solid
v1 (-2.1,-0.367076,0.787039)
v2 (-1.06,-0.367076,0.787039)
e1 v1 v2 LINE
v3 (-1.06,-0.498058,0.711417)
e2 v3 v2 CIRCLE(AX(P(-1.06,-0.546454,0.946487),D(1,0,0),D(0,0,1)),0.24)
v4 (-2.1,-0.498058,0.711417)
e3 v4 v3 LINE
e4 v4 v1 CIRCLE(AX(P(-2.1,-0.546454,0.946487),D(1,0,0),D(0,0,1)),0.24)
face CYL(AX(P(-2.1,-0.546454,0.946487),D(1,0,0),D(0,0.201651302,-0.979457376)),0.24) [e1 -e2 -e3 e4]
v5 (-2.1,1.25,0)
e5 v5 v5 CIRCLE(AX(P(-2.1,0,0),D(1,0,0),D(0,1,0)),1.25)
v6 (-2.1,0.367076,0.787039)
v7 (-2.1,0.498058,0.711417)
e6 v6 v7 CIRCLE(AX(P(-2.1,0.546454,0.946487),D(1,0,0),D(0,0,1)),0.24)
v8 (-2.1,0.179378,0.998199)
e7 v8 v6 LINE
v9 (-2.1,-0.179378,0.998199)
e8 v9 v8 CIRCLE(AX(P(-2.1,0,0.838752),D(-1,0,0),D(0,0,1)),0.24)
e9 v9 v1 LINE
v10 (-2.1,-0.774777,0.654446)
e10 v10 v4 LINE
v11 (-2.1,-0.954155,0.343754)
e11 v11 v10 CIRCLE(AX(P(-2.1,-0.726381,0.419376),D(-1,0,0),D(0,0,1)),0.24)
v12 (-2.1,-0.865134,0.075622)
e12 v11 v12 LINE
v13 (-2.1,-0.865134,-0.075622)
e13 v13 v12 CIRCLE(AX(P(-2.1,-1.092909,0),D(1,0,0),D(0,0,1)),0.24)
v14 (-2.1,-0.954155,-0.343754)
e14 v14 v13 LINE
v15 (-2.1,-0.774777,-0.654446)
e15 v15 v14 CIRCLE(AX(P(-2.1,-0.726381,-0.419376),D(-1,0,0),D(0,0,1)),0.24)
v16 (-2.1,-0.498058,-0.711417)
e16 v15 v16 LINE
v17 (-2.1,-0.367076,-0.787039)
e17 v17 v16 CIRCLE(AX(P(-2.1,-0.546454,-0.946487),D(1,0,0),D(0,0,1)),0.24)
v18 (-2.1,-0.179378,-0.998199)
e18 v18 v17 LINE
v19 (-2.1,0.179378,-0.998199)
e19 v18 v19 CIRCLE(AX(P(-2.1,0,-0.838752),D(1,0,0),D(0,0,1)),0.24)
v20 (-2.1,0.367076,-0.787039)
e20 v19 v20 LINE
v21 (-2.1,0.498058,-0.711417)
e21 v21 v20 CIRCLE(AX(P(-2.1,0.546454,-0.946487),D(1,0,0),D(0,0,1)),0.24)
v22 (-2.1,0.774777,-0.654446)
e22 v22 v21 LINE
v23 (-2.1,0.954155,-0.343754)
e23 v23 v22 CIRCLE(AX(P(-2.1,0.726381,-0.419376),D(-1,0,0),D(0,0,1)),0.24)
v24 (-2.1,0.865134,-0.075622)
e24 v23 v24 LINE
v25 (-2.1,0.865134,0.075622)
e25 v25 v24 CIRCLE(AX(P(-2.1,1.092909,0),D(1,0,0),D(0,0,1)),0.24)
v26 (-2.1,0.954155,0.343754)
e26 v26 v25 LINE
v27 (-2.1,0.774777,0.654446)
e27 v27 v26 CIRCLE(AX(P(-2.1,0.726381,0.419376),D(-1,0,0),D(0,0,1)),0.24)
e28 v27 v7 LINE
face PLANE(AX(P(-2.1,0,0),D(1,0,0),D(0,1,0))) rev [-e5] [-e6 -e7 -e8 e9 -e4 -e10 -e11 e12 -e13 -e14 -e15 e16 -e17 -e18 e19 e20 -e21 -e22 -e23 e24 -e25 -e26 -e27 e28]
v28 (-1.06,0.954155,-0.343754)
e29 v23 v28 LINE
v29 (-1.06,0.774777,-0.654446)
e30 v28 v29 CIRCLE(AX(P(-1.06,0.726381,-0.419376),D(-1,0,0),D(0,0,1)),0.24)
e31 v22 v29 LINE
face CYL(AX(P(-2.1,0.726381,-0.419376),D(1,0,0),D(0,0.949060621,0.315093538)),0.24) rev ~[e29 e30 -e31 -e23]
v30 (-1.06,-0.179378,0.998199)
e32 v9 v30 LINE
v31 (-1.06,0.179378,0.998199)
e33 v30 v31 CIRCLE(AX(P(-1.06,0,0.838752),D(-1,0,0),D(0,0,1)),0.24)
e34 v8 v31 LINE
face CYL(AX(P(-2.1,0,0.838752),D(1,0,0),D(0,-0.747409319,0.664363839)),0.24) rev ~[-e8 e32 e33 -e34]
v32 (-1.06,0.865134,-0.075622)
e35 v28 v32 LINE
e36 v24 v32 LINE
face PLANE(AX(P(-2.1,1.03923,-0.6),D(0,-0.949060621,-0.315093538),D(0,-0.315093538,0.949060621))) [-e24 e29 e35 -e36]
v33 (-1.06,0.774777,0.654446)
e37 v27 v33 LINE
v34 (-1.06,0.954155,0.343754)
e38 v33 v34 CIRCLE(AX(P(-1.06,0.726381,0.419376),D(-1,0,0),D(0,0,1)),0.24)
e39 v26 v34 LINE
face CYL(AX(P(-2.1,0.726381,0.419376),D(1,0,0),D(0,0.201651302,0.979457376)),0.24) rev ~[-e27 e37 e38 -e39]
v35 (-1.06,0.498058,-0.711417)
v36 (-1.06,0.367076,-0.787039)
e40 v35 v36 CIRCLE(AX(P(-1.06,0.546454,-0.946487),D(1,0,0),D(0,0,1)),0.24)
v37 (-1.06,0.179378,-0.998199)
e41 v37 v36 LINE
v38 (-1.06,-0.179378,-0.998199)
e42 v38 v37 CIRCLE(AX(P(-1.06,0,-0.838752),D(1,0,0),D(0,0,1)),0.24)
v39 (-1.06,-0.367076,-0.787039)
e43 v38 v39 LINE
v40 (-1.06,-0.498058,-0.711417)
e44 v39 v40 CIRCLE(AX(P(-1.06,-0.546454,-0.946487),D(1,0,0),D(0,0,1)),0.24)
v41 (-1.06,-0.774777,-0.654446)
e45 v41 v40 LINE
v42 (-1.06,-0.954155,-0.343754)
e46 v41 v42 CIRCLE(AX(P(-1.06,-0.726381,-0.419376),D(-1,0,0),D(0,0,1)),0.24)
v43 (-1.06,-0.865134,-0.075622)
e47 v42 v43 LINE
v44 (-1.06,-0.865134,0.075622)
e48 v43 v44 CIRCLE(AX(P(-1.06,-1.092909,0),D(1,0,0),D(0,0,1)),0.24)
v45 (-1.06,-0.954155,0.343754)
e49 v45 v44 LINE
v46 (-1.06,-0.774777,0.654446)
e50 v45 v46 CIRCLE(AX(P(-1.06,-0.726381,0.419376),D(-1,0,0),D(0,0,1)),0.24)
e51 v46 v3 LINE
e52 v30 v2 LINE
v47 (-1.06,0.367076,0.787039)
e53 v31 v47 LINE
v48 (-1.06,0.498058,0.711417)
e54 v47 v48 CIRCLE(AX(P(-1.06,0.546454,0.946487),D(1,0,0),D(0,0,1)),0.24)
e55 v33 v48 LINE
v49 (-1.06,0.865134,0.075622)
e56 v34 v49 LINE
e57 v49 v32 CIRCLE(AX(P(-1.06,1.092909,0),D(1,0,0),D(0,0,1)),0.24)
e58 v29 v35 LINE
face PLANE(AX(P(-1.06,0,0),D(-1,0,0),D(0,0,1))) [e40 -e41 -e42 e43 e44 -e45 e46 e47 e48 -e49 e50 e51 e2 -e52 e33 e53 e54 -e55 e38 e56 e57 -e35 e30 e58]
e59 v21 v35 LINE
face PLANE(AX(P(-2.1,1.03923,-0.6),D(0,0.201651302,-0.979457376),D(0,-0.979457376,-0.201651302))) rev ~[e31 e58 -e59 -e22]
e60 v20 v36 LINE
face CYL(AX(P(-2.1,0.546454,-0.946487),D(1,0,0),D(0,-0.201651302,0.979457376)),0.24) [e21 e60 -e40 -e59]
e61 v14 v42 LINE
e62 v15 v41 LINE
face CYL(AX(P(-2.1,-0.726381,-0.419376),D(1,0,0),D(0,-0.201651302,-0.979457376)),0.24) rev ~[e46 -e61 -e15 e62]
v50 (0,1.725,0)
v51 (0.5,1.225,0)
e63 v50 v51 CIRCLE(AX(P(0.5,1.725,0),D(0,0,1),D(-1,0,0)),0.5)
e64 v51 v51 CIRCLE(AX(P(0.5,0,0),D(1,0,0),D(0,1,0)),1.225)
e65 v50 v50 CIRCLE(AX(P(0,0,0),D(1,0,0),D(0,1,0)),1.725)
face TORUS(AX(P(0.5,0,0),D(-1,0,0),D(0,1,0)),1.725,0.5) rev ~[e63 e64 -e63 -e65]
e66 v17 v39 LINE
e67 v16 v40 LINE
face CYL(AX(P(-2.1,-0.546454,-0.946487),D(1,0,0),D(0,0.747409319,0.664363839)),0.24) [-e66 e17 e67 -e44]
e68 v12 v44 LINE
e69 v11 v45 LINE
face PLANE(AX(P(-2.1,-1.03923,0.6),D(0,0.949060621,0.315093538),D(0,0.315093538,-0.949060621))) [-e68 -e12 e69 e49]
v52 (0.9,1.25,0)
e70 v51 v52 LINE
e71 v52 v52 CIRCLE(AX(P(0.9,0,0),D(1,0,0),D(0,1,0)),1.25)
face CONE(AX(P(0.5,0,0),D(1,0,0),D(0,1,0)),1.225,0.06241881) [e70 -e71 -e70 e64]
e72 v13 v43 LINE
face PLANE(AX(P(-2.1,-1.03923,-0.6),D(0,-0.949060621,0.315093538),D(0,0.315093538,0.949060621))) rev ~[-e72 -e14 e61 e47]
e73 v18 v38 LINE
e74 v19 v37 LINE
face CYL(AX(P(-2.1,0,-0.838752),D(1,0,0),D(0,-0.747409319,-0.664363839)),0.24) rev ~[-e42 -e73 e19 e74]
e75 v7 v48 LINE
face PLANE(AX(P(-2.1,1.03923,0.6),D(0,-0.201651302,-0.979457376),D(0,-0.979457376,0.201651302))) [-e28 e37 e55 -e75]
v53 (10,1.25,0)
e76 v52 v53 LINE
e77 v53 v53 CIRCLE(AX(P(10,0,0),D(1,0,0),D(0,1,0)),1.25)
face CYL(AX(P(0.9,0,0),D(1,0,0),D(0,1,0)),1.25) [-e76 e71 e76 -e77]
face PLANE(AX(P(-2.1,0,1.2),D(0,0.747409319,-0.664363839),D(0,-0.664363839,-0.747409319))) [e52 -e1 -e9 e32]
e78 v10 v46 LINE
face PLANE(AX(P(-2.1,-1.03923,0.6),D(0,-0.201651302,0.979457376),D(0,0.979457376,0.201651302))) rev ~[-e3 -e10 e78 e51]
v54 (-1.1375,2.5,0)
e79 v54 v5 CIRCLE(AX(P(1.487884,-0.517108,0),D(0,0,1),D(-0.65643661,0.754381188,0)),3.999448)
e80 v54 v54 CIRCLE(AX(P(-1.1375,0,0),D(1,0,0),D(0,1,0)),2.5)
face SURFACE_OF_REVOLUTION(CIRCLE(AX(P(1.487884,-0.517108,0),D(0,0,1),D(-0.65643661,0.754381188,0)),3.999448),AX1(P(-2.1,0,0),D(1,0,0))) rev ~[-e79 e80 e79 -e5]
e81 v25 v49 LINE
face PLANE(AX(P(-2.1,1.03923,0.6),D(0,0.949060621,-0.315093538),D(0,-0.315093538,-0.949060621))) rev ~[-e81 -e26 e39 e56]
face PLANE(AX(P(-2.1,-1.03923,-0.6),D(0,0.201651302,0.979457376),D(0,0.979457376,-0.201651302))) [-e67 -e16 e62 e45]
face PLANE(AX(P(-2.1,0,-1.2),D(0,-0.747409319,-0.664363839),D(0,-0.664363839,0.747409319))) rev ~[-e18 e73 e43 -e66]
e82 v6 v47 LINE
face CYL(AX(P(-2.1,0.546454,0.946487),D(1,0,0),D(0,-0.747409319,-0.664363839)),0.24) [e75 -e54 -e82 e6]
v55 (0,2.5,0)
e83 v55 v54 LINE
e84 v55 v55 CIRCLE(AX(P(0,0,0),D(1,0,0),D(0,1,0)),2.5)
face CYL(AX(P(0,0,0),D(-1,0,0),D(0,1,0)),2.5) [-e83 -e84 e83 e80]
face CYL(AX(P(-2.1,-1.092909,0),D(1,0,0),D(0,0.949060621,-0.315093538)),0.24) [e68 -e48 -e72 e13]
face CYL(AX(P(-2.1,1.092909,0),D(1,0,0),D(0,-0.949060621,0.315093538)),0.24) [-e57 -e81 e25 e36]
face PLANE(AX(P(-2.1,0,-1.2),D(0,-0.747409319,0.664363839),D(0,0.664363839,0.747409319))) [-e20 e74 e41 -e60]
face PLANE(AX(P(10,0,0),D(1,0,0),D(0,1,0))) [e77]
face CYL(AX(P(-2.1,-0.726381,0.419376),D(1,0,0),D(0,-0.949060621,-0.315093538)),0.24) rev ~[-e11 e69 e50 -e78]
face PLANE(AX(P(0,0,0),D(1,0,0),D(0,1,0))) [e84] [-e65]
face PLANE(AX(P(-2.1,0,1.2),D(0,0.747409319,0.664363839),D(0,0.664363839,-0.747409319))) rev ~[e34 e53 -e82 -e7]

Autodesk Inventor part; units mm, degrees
ref_plane "YZ Plane" through (0, 0, 0) normal (1, 0, 0) x (0, 1, 0)
ref_plane "XZ Plane" through (0, 0, 0) normal (0, 1, 0) x (-1, 0, 0)
ref_plane "XY Plane" through (0, 0, 0) normal (0, 0, 1) x (1, 0, 0)
sketch "Sketch4" plane through (0, 0, 0) normal (0, 0, 1) x (1, 0, 0)
  line L0 (-2.1, 0) -> (10, 0)
  line L1 (0, 0) -> (-2.1, 0)
  line L2 (0, 2.5) -> (0, 1.725)
  line L3 (0.5, 1.225) -> (0.5, 1.225)
  line L4 (0.5, 1.225) -> (0.9, 1.25)
  arc A0 (0, 1.725) -> (0.5, 1.225) centre (0.5, 1.725) ccw
  line L5 (-2.1, 0) -> (-2.1, 1.25)
  line L6 (0, 2.5) -> (-1.1375, 2.5)
  arc A1 (-1.1375, 2.5) -> (-2.1, 1.25) centre (1.4883, -0.5175) ccw
  line L7 (0.9, 1.25) -> (10, 1.25)
  line L8 (10, 1.25) -> (10, 0)
  point P0 (0, 1.225)
  dimension "d71" = 0.5
  dimension "d72" = 10
  dimension "d74" = 0.4
  dimension "d75" = 2.45
  dimension "d78" = 2.5
  dimension "d82" = 4
  dimension "d83" = 2.1
  dimension "d84" = 5
  dimension "d104" = 9.1
  dimension "d105" = 2.5
revolve "Revolution7" add sketch "Sketch4" angle 360 about axis through (-2.1, 0, 0) along (1, 0, 0)
sketch "Sketch5" plane through (-2.1, 0, 0) normal (-1, 0, 0) x (0, 0, 1)
  circle A0 centre (0, 0) radius 1.2 construction
  circle A1 centre (0, 0) radius 0.84 construction
  line L0 (0, 0) -> (-0.7275, 0.42)
  line L1 (0, 0) -> (-0.7275, -0.42)
  line L2 (-1.8008, 0) -> (1.7887, 0)
  line L3 (-1.2, 0) -> (-0.7275, -0.42)
  line L4 (-1.2, 0) -> (-0.7275, 0.42)
  dimension "d88" = 2.4
  dimension "d89" = 1.68
  dimension "d90" = 30
  dimension "d91" = 30
extrude "Extrusion1" cut sketch "Sketch5" against normal blind 1.04
pattern_circular "Circular Pattern1" count 6 over 360 about axis through (-10, 0, 0) along (1, 0, 0) of "Extrusion1"
fillet "Fillet1" radius 0.24 12 edges at (-1.58, -1.0392, -0.6) (-1.58, -0.42, -0.7275) (-1.58, -0.84, 0) (-1.58, -1.0392, 0.6) (-1.58, -0.42, 0.7275) (-1.58, 0, 1.2) (-1.58, 0.84, 0) (-1.58, 1.0392, 0.6) (-1.58, 0.42, 0.7275) (-1.58, 0.42, -0.7275) (-1.58, 0, -1.2) (-1.58, 1.0392, -0.6)
thread "Thread7" size "M2.5x0.45" class "6g" standard "ISO Metric profile" length 9.1
properties part number "Flachkopfschraube mit Innenrund ISO 14583 - M2,5 x 10 - 4.8" material "Steel"
